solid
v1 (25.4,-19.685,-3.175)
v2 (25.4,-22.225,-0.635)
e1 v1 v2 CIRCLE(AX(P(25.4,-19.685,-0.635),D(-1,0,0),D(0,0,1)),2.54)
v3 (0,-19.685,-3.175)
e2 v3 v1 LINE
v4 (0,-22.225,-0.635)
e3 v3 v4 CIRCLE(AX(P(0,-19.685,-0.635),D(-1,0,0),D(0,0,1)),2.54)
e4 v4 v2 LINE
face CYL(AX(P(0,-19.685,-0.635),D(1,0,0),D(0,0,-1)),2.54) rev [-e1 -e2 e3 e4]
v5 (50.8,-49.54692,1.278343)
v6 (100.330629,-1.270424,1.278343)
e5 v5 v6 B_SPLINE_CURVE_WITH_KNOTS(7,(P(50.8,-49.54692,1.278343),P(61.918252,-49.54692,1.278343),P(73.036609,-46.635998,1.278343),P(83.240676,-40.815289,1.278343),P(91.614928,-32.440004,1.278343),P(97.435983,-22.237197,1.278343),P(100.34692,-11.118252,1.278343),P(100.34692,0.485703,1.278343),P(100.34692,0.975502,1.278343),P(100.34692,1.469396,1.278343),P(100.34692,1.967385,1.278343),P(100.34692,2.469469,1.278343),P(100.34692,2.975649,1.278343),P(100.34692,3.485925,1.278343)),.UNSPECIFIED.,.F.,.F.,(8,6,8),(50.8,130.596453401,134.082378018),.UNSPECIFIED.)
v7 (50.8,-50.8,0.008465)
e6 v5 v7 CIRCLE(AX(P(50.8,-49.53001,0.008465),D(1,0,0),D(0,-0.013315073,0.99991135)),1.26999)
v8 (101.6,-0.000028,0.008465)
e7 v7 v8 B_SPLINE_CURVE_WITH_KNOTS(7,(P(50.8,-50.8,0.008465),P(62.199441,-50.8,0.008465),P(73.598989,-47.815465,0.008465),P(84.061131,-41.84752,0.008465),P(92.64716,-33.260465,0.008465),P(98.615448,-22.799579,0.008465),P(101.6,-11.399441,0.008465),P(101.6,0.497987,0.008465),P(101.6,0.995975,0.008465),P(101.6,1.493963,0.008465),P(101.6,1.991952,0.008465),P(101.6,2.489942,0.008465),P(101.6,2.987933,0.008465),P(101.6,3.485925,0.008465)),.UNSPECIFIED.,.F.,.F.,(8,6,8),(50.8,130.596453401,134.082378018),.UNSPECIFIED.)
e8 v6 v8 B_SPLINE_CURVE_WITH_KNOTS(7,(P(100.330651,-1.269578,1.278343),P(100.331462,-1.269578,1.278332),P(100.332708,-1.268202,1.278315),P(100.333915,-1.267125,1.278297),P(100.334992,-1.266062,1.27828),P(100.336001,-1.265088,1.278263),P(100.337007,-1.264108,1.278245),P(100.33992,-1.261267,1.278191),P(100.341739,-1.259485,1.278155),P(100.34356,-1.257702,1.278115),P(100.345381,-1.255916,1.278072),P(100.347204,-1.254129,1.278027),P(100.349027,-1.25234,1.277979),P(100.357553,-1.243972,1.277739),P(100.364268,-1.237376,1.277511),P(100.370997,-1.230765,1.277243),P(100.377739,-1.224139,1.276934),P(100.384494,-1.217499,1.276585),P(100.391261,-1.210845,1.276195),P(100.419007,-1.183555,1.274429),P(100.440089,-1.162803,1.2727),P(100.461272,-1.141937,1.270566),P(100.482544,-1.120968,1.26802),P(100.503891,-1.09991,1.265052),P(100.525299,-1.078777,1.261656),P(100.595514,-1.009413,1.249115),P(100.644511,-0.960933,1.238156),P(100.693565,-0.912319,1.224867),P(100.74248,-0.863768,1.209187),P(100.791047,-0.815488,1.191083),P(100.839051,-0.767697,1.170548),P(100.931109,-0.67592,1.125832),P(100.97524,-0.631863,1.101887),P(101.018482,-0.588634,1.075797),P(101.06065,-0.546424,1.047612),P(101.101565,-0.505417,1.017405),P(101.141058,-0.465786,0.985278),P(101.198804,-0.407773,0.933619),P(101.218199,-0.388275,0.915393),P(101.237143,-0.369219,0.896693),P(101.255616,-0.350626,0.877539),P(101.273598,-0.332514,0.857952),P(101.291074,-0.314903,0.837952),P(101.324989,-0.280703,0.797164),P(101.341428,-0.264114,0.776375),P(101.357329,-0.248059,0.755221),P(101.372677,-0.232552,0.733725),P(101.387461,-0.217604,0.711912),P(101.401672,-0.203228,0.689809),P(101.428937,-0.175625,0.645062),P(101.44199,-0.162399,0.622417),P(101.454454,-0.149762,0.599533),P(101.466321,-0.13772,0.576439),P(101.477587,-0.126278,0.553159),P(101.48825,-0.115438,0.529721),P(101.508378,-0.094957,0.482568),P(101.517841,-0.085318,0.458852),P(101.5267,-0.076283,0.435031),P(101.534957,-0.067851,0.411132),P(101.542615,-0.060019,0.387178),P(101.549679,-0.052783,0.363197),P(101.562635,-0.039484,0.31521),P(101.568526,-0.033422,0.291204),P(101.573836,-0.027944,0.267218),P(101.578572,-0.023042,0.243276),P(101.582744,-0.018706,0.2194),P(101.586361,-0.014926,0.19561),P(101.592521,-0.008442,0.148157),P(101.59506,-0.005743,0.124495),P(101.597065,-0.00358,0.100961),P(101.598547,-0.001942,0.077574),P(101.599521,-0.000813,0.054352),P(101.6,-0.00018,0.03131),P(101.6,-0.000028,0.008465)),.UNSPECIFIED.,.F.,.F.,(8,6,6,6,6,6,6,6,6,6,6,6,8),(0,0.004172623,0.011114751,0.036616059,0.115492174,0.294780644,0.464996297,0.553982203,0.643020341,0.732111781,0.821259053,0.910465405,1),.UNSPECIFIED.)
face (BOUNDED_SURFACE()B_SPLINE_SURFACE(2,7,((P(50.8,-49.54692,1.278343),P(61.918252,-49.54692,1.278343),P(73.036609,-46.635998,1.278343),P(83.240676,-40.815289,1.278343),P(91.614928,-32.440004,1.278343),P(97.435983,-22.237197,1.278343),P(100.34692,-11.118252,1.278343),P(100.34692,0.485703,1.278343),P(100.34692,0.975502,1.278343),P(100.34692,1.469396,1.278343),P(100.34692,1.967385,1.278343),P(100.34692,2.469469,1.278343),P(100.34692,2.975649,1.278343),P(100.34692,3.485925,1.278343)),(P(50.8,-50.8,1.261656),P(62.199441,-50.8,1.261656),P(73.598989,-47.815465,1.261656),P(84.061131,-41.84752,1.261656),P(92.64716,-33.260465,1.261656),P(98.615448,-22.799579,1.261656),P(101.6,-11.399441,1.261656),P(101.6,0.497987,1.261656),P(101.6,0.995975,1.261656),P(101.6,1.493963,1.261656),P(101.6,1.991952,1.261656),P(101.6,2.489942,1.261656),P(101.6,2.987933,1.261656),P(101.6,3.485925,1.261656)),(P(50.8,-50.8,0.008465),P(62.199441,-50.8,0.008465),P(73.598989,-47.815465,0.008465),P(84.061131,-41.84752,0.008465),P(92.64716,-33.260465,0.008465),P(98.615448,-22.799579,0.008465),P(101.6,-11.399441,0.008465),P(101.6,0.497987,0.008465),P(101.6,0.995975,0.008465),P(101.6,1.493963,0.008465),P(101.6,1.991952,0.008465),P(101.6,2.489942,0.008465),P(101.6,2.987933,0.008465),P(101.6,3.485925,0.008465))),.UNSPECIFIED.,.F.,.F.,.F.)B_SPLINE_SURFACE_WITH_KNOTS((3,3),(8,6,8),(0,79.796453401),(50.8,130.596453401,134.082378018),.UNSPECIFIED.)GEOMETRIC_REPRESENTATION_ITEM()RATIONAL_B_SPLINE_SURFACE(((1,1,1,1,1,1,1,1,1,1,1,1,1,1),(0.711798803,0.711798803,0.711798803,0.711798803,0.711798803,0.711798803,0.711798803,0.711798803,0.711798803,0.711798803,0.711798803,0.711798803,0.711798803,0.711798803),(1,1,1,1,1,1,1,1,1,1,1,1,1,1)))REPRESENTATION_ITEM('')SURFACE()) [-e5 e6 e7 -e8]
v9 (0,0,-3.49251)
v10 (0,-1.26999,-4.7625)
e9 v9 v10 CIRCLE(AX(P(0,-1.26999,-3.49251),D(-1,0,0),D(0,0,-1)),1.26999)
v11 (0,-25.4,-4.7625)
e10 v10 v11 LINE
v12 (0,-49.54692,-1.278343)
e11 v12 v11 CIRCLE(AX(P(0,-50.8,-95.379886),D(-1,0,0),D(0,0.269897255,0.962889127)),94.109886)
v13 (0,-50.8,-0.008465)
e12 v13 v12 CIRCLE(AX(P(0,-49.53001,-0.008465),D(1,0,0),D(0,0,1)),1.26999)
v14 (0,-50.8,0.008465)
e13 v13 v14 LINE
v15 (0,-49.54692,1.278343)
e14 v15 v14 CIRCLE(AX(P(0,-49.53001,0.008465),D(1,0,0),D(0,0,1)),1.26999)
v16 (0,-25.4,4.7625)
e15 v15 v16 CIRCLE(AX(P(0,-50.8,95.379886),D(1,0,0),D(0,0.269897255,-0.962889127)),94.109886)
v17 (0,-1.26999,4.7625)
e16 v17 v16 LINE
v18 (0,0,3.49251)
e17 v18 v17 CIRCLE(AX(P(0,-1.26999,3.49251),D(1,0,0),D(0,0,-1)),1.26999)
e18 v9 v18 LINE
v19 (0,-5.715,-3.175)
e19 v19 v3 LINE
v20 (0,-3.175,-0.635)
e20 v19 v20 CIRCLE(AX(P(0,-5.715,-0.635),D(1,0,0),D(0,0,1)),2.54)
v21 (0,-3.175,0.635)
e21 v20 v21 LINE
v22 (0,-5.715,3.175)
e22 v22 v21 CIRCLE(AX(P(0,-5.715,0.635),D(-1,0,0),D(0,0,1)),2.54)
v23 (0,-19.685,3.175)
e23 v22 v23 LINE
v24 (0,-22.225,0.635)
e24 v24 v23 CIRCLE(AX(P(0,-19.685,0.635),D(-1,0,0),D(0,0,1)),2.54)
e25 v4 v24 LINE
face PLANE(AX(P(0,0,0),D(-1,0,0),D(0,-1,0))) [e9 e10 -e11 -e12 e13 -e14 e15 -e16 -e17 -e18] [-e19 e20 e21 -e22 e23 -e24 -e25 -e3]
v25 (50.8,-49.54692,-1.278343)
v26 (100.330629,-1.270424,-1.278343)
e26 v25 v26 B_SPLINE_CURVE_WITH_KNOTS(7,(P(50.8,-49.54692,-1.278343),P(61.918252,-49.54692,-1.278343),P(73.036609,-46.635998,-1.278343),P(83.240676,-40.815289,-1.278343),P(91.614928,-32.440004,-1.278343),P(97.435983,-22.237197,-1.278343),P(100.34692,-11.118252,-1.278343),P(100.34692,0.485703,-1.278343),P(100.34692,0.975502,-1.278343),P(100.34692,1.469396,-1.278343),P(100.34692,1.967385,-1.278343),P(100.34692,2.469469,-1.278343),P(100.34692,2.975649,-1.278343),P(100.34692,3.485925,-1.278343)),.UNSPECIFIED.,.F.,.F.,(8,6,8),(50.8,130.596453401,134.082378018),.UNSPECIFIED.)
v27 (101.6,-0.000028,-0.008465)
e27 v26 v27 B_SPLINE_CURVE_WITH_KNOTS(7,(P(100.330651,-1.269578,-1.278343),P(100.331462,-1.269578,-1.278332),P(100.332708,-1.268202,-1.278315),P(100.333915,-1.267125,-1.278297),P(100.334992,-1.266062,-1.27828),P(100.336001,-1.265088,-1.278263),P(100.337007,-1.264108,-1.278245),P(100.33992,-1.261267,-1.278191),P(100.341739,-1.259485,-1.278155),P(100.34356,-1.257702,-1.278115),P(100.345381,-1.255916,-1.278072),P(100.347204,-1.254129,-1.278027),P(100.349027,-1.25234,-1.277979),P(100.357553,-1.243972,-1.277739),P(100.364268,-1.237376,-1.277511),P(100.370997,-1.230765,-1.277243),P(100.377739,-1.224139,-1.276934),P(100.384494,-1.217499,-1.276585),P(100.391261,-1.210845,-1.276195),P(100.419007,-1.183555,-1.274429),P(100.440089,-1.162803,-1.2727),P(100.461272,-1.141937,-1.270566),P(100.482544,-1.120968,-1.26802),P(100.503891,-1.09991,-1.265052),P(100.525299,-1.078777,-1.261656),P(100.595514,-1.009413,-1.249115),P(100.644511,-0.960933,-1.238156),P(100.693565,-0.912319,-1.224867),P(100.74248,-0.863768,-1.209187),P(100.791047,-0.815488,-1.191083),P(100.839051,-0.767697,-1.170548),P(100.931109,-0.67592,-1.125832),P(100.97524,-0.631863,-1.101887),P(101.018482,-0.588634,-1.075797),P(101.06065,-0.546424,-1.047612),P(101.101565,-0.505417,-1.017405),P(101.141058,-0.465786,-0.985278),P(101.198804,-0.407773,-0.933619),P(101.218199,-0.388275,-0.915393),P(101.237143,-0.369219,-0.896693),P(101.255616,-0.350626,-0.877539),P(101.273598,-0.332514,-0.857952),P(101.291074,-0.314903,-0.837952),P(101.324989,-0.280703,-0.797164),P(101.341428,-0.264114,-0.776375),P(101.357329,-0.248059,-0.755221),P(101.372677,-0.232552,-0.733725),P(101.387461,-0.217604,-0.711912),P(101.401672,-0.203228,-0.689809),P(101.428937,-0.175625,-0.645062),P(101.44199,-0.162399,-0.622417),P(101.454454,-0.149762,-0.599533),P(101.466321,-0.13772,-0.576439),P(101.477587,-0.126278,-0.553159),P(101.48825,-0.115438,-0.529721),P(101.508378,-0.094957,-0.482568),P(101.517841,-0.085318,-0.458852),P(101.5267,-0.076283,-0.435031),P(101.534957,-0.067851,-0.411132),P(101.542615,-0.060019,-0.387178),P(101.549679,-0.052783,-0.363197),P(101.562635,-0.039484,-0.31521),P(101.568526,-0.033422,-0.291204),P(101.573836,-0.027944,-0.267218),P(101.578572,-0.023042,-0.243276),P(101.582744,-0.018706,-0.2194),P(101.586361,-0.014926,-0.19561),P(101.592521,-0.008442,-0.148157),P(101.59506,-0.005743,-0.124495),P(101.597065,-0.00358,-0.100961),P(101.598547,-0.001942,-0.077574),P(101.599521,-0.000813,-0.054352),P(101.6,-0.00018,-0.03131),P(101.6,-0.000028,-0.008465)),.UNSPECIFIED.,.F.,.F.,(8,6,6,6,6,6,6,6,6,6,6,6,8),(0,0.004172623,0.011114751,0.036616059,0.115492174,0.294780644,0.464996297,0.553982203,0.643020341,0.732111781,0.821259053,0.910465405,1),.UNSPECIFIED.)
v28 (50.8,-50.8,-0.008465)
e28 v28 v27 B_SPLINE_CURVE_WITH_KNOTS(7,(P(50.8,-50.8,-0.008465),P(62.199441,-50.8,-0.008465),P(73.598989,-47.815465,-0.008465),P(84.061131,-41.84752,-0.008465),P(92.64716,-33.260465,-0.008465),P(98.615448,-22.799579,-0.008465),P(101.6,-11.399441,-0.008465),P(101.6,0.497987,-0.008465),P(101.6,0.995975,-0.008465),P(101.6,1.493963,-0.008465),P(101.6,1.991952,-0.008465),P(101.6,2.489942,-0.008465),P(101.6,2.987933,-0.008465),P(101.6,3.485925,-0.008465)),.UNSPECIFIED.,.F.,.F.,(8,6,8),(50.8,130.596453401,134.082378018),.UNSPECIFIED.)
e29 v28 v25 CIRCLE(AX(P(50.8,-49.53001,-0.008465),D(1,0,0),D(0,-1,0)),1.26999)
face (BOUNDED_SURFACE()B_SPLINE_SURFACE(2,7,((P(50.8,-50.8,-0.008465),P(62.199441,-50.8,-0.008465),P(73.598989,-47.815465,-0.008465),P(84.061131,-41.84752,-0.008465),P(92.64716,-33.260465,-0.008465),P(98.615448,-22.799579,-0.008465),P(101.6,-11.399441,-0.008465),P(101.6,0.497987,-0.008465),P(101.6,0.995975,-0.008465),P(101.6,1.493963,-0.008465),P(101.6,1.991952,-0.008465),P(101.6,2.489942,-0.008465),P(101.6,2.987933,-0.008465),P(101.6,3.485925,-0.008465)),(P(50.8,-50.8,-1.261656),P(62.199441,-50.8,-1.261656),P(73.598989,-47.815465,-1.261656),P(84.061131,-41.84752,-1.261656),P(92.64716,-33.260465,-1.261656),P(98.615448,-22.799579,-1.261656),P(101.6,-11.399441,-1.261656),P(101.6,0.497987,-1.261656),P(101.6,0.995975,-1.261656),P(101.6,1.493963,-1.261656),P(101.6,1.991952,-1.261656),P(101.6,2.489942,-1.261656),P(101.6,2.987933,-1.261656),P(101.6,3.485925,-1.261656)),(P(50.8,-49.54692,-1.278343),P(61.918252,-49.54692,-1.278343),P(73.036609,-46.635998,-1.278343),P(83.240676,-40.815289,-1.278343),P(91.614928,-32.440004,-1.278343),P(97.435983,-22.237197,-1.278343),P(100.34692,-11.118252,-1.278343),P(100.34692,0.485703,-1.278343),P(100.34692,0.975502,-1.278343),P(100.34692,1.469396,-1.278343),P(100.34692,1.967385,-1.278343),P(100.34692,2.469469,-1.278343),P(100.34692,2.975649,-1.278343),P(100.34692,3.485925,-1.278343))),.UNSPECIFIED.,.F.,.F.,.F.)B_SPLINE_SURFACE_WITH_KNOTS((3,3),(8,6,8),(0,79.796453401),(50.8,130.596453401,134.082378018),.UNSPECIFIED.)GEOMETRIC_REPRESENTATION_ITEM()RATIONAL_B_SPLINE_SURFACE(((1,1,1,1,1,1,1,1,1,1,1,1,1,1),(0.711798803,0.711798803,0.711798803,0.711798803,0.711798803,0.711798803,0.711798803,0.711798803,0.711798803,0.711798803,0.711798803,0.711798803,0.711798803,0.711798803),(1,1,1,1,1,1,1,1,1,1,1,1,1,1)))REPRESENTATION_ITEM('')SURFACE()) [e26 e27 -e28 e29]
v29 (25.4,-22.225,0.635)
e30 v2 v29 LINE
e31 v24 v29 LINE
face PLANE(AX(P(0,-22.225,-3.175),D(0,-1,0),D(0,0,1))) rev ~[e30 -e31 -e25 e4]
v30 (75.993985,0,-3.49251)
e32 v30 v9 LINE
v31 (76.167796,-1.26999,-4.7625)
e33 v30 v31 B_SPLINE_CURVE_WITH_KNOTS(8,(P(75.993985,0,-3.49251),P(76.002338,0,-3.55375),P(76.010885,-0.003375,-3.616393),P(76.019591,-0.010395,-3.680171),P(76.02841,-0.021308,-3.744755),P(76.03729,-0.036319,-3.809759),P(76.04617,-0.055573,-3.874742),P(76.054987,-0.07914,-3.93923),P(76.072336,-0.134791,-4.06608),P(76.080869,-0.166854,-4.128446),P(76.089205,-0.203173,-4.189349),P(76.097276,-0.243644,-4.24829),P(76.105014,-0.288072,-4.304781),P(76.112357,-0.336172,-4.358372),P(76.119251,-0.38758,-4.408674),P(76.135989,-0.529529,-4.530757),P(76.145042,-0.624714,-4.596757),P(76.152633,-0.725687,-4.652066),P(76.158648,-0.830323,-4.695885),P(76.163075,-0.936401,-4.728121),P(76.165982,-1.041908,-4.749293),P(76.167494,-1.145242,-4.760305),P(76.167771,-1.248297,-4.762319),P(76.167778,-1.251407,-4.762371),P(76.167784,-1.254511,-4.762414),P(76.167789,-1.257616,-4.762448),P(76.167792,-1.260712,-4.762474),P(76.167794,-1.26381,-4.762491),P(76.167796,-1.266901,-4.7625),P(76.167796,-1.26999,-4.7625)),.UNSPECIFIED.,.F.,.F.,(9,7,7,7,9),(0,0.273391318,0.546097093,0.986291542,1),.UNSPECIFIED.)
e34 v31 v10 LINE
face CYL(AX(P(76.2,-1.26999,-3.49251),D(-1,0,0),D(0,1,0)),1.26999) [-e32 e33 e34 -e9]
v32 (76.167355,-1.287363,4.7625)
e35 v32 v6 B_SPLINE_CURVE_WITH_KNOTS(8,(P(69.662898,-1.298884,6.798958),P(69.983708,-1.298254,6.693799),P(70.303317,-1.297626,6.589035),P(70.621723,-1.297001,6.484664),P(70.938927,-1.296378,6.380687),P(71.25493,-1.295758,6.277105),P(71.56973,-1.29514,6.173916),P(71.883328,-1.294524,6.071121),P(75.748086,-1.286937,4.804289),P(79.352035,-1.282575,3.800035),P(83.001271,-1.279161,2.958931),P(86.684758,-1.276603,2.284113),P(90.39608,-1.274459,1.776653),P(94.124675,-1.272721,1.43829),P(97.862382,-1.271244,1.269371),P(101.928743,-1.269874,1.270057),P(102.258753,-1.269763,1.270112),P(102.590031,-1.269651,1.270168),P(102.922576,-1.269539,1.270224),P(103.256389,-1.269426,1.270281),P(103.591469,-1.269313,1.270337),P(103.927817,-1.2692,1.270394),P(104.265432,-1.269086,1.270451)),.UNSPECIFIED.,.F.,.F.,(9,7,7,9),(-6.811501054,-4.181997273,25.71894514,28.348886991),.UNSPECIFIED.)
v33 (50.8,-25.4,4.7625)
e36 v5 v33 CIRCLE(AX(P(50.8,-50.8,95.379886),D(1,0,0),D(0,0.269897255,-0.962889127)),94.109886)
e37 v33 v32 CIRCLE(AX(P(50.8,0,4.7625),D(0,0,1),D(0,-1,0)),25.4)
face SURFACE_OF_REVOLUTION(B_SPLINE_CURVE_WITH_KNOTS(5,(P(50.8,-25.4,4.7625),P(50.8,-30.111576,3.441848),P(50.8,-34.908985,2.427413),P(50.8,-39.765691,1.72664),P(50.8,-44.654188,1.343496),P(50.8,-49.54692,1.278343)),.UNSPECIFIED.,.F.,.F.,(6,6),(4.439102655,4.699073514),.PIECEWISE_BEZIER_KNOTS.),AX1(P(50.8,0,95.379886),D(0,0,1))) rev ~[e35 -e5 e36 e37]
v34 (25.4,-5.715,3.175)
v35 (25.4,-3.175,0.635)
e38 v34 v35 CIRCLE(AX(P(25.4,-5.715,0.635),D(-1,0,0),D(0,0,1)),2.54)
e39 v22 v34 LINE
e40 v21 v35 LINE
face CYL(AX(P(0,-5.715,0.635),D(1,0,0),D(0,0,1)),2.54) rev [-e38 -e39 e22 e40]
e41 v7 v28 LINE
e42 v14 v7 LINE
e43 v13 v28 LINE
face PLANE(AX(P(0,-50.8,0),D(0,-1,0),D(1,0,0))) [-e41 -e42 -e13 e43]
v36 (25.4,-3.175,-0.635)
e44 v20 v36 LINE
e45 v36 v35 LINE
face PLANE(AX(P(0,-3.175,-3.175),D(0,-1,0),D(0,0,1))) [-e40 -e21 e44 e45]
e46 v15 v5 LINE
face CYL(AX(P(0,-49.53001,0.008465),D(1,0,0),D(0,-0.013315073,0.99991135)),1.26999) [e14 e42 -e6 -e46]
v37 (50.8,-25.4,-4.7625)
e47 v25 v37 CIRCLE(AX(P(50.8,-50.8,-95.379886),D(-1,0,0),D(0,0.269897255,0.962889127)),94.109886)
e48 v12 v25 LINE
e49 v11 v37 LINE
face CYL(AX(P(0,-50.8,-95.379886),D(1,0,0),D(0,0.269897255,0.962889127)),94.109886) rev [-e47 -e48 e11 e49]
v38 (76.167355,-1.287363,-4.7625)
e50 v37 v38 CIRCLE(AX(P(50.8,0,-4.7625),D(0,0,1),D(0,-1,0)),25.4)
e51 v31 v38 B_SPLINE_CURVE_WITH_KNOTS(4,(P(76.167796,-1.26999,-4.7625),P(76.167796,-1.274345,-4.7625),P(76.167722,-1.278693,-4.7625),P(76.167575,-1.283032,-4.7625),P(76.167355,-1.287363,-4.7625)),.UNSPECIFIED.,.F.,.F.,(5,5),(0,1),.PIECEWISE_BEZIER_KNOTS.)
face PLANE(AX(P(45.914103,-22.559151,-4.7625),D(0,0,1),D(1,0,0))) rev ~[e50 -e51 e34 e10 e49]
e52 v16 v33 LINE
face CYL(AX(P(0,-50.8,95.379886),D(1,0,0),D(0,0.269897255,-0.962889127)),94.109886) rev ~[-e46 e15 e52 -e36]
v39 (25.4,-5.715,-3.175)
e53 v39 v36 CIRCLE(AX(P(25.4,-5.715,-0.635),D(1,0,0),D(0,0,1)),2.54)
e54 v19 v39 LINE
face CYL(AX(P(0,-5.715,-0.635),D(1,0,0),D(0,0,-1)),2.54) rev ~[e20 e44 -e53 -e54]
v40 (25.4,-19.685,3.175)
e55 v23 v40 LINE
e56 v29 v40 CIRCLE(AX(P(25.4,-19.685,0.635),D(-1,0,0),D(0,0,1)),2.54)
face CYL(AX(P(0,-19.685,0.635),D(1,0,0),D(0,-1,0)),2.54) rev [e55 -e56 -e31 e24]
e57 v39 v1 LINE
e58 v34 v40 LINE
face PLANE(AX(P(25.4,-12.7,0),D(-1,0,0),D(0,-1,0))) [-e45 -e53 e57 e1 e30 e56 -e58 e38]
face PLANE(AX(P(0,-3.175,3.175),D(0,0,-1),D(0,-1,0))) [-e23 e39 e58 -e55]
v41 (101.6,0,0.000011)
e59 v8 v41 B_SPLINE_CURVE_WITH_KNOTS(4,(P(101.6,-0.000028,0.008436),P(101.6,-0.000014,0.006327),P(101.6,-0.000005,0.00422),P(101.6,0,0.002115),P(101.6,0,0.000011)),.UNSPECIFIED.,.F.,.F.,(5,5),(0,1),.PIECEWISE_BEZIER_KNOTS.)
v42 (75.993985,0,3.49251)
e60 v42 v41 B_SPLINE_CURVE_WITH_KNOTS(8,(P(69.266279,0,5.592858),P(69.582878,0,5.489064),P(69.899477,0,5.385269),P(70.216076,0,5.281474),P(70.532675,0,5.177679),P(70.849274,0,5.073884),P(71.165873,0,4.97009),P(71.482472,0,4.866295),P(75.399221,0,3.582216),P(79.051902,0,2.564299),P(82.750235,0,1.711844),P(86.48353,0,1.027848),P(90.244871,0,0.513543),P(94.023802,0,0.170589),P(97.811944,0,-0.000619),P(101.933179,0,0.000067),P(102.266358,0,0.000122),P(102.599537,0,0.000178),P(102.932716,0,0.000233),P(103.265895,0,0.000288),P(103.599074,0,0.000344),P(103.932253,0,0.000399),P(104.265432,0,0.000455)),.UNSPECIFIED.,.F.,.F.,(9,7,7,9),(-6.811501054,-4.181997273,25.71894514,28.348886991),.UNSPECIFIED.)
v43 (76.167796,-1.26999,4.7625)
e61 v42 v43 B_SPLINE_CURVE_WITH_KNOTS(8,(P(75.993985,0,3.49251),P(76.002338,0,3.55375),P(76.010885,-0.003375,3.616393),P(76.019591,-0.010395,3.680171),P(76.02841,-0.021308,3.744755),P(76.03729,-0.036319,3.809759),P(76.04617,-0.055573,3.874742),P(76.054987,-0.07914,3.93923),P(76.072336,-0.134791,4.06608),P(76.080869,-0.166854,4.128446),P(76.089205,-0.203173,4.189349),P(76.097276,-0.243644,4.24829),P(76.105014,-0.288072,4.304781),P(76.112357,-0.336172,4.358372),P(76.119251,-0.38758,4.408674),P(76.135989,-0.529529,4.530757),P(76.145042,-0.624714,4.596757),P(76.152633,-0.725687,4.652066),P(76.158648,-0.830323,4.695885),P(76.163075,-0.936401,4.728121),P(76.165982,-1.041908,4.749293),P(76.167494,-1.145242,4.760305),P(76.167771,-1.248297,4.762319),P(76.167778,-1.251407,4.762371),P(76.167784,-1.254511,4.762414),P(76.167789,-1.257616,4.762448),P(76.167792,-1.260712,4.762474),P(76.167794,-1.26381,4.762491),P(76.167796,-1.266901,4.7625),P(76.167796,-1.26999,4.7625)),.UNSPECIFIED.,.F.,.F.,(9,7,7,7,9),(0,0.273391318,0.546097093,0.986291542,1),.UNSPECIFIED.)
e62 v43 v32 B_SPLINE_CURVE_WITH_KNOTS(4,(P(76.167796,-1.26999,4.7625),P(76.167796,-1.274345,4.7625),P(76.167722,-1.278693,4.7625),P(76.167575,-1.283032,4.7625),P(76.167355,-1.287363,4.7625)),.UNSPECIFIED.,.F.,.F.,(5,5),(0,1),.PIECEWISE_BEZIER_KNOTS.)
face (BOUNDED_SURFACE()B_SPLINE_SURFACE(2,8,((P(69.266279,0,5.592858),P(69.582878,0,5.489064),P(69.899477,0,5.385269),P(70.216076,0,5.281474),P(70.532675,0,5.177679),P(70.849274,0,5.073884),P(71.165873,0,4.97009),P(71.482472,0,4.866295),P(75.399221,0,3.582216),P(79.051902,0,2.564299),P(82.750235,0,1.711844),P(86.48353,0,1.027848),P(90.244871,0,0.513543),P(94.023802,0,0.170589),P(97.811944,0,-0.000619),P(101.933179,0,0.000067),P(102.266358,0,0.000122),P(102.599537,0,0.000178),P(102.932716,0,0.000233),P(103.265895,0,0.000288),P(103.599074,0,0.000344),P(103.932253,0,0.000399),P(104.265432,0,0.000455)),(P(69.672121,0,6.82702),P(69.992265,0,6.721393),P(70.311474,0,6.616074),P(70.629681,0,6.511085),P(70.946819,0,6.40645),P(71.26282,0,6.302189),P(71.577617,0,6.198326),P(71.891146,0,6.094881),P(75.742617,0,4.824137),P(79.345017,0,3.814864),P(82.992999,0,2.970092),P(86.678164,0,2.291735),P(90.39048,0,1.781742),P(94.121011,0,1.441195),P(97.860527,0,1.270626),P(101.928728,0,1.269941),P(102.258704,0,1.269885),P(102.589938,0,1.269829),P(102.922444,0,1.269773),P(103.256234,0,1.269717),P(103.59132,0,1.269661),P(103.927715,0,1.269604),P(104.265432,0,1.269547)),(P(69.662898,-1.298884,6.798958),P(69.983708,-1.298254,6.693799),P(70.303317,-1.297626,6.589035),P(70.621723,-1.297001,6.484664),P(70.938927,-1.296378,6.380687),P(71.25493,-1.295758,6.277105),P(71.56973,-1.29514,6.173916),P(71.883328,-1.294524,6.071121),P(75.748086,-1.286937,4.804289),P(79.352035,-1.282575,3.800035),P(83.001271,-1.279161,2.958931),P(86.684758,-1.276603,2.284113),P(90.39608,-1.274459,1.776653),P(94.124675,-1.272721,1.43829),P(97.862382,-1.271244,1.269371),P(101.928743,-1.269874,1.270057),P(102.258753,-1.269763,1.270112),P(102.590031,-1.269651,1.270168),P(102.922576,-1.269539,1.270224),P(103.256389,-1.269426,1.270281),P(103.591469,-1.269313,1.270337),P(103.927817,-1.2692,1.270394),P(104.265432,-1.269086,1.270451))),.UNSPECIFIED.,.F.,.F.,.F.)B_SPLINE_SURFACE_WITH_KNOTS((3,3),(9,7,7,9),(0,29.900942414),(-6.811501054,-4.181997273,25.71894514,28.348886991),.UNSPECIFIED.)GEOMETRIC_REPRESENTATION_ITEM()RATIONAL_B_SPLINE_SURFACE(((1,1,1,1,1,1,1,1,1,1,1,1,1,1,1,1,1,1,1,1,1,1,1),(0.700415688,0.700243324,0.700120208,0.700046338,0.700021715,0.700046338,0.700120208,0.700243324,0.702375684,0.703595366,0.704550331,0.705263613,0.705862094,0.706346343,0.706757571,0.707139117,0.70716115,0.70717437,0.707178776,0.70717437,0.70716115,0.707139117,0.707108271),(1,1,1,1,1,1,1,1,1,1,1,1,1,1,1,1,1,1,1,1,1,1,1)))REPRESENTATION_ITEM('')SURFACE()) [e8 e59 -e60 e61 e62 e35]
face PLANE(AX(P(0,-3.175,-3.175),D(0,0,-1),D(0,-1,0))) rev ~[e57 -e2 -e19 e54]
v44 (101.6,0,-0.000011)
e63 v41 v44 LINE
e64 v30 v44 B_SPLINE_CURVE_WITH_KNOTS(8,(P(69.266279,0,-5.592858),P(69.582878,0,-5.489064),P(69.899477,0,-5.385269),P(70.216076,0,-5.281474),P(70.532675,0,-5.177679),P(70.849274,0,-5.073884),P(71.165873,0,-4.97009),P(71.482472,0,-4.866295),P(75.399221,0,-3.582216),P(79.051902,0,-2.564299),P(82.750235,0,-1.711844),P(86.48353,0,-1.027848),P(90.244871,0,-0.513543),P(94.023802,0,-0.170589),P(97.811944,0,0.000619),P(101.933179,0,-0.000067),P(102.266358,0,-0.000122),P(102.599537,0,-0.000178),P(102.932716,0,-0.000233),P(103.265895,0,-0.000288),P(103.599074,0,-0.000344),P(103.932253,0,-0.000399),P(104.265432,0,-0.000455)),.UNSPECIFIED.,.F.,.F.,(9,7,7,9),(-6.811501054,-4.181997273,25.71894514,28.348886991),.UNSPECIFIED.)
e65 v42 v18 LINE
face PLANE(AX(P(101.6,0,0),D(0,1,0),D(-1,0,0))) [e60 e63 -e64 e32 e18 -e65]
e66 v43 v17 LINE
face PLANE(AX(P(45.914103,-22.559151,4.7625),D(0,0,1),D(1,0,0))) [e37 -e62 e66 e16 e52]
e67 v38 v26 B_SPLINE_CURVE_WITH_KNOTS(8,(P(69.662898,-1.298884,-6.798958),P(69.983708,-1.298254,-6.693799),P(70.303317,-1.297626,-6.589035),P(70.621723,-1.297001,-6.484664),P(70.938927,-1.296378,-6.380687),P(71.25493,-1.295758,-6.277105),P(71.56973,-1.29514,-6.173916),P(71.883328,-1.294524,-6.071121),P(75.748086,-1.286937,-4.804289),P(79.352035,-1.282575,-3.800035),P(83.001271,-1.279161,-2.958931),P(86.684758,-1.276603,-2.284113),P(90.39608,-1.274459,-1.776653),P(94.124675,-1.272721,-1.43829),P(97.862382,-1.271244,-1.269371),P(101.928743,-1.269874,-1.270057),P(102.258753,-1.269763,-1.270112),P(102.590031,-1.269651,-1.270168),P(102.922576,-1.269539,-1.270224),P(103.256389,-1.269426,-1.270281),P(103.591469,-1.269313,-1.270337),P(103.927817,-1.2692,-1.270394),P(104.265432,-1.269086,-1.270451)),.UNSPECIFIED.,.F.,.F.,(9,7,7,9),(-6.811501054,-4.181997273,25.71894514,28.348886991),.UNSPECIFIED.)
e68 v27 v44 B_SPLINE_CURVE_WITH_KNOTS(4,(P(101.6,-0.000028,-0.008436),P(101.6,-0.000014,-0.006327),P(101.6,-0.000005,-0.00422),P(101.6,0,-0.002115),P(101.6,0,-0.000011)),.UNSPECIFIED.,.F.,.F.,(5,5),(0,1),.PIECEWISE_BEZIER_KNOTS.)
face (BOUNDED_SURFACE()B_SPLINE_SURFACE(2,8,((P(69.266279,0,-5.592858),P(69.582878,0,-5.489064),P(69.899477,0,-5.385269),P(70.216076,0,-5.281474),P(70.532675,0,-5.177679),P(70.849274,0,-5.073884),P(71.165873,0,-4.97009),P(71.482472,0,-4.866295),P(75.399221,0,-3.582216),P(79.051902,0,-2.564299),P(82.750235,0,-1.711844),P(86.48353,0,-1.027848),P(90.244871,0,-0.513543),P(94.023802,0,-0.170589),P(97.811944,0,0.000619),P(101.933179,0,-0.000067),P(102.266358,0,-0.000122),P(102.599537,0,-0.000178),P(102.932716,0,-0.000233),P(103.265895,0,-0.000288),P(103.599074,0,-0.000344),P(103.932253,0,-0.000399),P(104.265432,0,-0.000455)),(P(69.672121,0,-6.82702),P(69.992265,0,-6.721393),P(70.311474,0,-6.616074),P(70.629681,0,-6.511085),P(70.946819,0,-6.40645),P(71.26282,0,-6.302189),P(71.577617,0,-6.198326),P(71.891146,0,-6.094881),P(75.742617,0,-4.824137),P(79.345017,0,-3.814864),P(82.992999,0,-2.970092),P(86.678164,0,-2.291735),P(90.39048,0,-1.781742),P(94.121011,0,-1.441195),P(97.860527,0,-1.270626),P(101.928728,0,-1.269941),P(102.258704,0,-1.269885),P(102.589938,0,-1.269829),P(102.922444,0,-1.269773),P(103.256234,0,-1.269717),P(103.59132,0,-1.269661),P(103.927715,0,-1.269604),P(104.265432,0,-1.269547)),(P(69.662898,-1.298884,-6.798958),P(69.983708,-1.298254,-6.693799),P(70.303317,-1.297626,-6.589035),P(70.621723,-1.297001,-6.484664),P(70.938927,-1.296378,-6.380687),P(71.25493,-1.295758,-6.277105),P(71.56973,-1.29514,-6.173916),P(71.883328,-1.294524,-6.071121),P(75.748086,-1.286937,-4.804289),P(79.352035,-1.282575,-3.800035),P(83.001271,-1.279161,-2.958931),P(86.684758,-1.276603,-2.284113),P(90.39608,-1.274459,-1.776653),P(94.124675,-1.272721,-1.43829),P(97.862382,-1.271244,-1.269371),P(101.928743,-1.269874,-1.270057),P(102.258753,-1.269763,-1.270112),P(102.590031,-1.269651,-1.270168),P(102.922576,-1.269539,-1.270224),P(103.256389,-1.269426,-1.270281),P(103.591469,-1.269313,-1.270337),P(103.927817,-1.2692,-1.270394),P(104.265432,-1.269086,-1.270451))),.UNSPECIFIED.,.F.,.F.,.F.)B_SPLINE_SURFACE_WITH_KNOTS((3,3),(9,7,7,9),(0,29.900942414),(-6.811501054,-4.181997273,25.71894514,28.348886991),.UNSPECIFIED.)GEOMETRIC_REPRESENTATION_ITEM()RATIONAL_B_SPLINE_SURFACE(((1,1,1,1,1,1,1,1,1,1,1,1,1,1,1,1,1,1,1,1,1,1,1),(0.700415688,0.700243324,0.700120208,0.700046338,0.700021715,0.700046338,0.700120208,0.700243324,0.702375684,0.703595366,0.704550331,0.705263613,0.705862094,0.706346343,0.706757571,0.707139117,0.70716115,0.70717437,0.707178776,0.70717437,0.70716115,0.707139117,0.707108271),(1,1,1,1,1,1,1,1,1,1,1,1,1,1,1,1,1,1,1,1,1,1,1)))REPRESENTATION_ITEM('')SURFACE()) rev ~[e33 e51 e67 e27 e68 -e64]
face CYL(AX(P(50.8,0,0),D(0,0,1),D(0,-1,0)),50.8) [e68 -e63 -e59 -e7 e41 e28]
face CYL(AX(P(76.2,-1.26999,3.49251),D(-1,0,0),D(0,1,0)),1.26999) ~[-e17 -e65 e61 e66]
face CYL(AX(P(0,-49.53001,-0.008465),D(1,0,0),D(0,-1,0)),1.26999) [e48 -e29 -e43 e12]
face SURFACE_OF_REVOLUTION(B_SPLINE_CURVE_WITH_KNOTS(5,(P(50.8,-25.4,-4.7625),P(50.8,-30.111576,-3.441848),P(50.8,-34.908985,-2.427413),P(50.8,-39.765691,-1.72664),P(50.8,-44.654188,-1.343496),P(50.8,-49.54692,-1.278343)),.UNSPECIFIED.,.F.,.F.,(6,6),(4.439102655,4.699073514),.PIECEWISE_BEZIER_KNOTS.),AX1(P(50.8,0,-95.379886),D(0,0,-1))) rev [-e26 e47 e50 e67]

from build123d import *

# Parameters (mm, degrees)
F1_DEPTH = 4.7625
F2_W     = 19.05
F2_H     = 6.35
F3_DEPTH = 25.4
F4_R     = 2.54
F9_R     = 1.26999


# Not quite as in the source:
# - a fillet or chamfer is up to 0.001 mm smaller than in the source, because OpenCascade refuses the exact size


with BuildPart() as f1:
    # F0 (on Top) → F1 (new body, symmetric)
    with BuildSketch(Plane.XY):
        with BuildLine():
            Line((101.6, 0), (0, 0))
            Line((0, 0), (0, -50.8))
            Line((0, -50.8), (50.8, -50.8))
            ThreePointArc((50.8, -50.8), (86.7210244843, -35.9210244843), (101.6, 0))
        make_face()
    extrude(amount=F1_DEPTH, both=True)

    # F2 (on face) → F3 (cut)
    with BuildSketch(Plane(origin=(0, 0, 0), x_dir=(0, -1, 0), z_dir=(-1, 0, 0))):
        with Locations((12.7, 0)):
            Rectangle(F2_W, F2_H)
    extrude(amount=-F3_DEPTH, mode=Mode.SUBTRACT)

    # F4
    f4_edges = [f1.edges().sort_by_distance(p)[0] for p in [
        (12.7, -3.175, 3.175),
        (12.7, -22.225, 3.175),
        (12.7, -3.175, -3.175),
        (12.7, -22.225, -3.175),
    ]]
    fillet(f4_edges, radius=F4_R)


with BuildPart() as f6:
    # F6: sweep along a path in F6_path
    with BuildLine(Plane(origin=(50.8, -50.8, 4.7625), x_dir=(0, 1, 0), z_dir=(0, 0, 1))) as f6_path:
        Line((0, 50.8), (0, 0))
        ThreePointArc((0, 0), (14.8789755157, -35.9210244843), (50.8, -50.8))
    # F5 (on face) → F6 (sweep)
    with BuildSketch(Plane(origin=(0, 0, 0), x_dir=(0, -1, 0), z_dir=(-1, 0, 0))):
        with BuildLine():
            Line((50.8, 4.7625), (25.4, 4.7625))
            ThreePointArc((25.4, 4.7625), (37.9805074569, 2.1472133229), (50.8, 1.27))
            Line((50.8, 1.27), (50.8, 4.7625))
        make_face()
    sweep(path=f6_path.line)


with BuildPart() as f7_1:
    # F7: instance of F6
    add(f6.part.mirror(Plane.XY))


with BuildPart() as f1_1:
    add(f1.part)

    # F8: cut F6, F7_1
    add(f6.part, mode=Mode.SUBTRACT)
    add(f7_1.part, mode=Mode.SUBTRACT)

    # F9 (radius 1.27 in the source; OpenCascade refuses exactly that, so slightly less here)
    f9_edges = [f1_1.edges().sort_by_distance(p)[0] for p in [
        (38.1, 0, 4.7625),
        (38.1, 0, -4.7625),
        (88.780507, 0, 2.147213),
        (88.780507, 0, -2.147213),
        (25.4, -50.8, 1.27),
        (25.4, -50.8, -1.27),
        (86.721024, -35.921024, 1.27),
        (86.721024, -35.921024, -1.27),
    ]]
    fillet(f9_edges, radius=F9_R)


solid = f1_1.part
